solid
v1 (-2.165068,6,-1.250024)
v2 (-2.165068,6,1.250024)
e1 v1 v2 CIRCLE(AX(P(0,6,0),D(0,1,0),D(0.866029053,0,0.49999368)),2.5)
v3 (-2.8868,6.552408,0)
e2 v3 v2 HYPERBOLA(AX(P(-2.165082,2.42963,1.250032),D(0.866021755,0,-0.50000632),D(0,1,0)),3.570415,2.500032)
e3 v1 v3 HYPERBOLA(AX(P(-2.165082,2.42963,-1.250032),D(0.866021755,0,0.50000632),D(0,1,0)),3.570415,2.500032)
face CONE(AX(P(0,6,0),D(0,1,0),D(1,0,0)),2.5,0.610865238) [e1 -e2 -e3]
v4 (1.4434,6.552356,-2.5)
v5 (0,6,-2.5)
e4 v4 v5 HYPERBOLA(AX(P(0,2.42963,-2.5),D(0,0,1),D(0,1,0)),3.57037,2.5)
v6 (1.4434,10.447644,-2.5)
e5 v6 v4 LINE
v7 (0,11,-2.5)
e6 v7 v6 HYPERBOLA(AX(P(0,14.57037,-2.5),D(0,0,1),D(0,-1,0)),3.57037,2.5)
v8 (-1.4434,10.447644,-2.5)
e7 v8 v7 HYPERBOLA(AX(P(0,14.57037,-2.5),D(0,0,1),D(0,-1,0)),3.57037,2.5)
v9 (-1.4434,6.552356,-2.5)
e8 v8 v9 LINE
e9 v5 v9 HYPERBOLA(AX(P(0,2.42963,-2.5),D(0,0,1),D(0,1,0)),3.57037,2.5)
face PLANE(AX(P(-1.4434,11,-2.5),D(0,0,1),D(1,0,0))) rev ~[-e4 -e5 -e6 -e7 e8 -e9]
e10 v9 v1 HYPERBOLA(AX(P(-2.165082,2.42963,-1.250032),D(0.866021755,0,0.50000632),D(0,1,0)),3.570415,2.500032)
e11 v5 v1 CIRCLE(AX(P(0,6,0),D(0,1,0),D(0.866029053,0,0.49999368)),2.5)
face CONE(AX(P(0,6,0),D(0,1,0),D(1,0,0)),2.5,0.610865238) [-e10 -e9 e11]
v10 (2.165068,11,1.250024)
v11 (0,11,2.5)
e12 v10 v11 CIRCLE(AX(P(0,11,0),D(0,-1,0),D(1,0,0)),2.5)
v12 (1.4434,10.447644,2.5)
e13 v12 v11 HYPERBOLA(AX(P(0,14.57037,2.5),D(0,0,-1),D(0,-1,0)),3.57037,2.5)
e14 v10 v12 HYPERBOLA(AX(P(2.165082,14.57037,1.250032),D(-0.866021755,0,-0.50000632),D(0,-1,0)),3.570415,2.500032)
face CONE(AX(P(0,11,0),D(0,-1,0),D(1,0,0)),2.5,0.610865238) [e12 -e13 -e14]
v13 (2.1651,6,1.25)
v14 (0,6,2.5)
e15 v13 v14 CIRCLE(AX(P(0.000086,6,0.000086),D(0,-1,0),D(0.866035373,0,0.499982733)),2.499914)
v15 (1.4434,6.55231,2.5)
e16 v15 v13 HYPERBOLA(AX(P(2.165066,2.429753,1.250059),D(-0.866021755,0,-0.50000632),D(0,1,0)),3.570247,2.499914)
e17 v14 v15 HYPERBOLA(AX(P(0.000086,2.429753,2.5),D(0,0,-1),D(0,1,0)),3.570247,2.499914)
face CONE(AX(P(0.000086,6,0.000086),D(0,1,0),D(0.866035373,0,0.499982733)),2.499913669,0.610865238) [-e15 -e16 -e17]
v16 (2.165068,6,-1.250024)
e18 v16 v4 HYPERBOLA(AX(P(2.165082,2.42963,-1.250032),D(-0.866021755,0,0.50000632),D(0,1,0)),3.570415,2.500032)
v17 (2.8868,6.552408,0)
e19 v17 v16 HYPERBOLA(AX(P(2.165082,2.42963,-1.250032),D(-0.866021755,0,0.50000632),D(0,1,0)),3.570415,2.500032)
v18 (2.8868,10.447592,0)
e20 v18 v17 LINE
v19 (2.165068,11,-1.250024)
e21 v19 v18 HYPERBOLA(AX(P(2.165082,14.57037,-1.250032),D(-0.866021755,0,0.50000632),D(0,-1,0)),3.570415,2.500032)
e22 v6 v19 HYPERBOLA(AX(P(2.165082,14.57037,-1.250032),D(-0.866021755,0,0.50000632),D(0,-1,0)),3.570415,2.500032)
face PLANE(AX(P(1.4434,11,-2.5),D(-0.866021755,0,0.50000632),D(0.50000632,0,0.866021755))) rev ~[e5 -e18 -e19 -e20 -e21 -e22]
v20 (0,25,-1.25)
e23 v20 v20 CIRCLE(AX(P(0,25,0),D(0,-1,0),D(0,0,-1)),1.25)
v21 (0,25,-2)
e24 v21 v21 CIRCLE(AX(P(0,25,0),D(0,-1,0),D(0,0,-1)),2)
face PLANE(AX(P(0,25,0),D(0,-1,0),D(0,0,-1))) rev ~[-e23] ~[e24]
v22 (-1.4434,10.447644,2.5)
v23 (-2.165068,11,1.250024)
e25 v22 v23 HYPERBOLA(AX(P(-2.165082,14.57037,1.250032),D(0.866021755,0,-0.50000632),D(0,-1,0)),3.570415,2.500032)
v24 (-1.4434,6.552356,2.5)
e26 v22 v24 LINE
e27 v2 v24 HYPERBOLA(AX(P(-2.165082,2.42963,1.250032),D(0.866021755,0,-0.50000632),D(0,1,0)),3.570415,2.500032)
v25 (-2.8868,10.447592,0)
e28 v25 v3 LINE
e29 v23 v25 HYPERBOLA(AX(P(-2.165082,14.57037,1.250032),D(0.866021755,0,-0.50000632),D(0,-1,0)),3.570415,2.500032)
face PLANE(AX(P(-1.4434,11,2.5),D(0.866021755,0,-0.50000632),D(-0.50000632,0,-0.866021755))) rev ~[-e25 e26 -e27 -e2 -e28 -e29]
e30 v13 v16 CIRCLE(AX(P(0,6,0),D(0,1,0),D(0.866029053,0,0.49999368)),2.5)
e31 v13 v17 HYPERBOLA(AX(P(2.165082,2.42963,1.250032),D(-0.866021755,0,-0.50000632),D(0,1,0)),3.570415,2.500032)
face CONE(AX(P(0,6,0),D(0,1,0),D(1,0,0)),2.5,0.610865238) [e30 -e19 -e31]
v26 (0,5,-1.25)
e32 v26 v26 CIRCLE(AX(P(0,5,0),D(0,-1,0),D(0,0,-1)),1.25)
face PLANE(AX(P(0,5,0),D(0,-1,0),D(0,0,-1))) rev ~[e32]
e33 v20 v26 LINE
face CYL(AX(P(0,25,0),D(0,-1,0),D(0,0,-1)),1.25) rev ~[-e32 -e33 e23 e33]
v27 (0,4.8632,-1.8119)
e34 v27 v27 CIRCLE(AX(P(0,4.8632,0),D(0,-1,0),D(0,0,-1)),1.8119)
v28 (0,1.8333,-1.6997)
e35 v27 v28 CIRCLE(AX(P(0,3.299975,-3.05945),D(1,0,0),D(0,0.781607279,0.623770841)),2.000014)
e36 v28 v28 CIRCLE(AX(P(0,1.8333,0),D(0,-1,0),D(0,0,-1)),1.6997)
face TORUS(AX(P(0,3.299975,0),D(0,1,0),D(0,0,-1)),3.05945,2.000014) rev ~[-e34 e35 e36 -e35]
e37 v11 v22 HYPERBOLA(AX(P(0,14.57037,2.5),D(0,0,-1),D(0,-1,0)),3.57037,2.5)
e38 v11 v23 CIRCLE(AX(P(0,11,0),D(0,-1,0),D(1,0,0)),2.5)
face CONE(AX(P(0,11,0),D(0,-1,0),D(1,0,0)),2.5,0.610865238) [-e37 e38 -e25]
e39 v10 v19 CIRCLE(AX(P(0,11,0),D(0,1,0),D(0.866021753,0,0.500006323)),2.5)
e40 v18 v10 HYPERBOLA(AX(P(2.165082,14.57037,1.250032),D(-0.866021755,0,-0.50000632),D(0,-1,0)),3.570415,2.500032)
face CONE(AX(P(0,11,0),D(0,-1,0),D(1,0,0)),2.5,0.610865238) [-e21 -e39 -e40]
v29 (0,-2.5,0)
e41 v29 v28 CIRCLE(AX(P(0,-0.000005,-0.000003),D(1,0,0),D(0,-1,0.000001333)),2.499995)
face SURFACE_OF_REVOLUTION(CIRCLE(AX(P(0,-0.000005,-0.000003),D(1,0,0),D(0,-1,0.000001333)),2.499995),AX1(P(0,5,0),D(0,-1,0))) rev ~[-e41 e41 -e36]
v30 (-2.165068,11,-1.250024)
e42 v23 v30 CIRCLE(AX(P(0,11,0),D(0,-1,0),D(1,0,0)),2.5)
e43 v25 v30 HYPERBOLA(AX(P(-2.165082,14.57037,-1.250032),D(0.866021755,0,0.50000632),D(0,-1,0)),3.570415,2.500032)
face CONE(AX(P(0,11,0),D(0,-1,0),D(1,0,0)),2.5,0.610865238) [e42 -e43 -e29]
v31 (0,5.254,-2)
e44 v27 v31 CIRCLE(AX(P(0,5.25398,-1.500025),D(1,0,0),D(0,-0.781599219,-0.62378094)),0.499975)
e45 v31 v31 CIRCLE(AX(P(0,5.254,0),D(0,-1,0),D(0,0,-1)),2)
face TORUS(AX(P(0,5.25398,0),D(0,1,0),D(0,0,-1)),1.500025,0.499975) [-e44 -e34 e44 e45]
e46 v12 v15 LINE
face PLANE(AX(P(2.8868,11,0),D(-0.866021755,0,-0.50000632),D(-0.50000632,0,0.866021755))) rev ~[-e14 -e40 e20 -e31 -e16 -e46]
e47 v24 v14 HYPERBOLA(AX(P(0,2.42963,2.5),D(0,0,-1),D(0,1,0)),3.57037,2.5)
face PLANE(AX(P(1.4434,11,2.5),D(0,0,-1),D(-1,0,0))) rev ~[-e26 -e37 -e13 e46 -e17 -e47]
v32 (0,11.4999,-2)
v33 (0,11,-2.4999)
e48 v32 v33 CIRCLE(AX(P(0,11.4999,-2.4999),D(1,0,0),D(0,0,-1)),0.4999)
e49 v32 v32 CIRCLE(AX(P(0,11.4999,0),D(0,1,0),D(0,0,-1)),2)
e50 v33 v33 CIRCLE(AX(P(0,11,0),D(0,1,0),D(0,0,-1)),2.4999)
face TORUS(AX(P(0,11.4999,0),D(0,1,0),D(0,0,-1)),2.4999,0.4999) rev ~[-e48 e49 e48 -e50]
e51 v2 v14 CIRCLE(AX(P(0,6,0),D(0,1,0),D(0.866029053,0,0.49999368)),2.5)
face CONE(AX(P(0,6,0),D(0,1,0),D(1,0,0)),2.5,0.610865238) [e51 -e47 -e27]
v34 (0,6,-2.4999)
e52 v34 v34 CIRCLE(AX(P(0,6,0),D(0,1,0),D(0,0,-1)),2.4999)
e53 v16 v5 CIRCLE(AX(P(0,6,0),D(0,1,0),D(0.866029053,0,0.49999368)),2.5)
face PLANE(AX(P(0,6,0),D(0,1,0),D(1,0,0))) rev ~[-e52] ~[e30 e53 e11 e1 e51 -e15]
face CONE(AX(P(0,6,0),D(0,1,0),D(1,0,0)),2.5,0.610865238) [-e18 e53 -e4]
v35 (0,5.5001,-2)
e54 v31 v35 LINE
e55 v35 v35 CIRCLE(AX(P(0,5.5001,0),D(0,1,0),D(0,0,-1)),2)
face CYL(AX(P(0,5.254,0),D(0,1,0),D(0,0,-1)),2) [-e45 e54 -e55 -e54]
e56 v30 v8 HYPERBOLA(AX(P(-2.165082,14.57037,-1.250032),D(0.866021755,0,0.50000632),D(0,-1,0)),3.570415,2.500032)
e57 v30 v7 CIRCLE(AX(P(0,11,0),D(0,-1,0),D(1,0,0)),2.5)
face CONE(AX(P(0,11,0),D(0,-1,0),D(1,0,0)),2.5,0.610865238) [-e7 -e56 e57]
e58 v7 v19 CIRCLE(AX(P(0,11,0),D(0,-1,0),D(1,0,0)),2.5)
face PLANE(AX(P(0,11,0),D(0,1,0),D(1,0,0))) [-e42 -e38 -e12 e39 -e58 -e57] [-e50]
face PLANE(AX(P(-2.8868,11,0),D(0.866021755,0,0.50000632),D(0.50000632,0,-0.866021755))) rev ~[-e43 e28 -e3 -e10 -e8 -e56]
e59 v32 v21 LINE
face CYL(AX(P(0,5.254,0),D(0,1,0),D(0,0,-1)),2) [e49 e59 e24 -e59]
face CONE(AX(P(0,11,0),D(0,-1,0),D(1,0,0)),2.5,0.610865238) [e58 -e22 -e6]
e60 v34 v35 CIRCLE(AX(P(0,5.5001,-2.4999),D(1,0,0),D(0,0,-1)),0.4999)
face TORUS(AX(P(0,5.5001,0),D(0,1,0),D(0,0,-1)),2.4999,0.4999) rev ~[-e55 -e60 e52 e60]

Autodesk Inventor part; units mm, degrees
ref_plane "YZ Plane" through (0, 0, 0) normal (1, 0, 0) x (0, 1, 0)
ref_plane "XZ Plane" through (0, 0, 0) normal (0, 1, 0) x (-1, 0, 0)
sketch "Sketch1" plane through (0, 0, 0) normal (1, 0, 0) x (0, 1, 0)
  arc A0 (-2.5, 0) -> (1.8333, -1.6997) centre (0, 0) ccw
  line L0 (5.254, -2) -> (25, -2)
  line L1 (25, -2) -> (25, -1.25)
  arc A1 (4.8632, -1.8119) -> (1.8333, -1.6997) centre (3.3, -3.0594) ccw
  arc A2 (4.8632, -1.8119) -> (5.254, -2) centre (5.254, -1.5) ccw
  line L2 (25, -1.25) -> (5, -1.25)
  line L3 (5, -1.25) -> (5, 0)
  line L4 (5, 0) -> (-2.5, 0)
  point P0 (4.9964, -2)
  dimension "d0" = 5
  dimension "d2" = 3.3
  dimension "d3" = 4
  dimension "d4" = 25
  dimension "d6" = 0.5
  dimension "d8" = 20
  dimension "d9" = 0.75
  dimension "d10" = 19.746
  dimension "d11" = 5
revolve "Revolution1" add sketch "Sketch1" angle 360 about axis through (0, 5, 0) along (0, -1, 0)
thread "Thread1" size "M2.5x0.35" class "6H" standard "ANSI Metric M Profile" full length
ref_plane "Work Plane1" through (0, 11, 0) normal (0, 1, 0) x (1, 0, 0)
sketch "Sketch2" plane through (0, 11, 0) normal (0, 1, 0) x (1, 0, 0)
  line L0 (1.4434, 2.5) -> (2.8868, 0)
  line L1 (2.8868, 0) -> (1.4434, -2.5)
  line L2 (1.4434, -2.5) -> (-1.4434, -2.5)
  line L3 (-1.4434, -2.5) -> (-2.8868, 0)
  line L4 (-2.8868, 0) -> (-1.4434, 2.5)
  line L5 (-1.4434, 2.5) -> (1.4434, 2.5)
  circle A0 centre (0, 0) radius 1.25 projected
  point P0 (0, 0)
  point P1 (0, 0)
  dimension "d16" = 5
extrude "Extrusion1" add sketch "Sketch2" against normal blind 5
sketch "Sketch3" plane through (0, 11, 0) normal (0, 1, 0) x (1, 0, 0)
  circle A0 centre (0, 0) radius 2.5
  line L0 (-2.8868, 0) -> (-1.4434, 2.5) projected
extrude "Extrusion2" cut sketch "Sketch3" against normal blind 40 draft 35 and the other way blind 40 keep common part
sketch "Sketch4" plane through (0, 6, 0) normal (0, -1, 0) x (1, 0, 0)
  arc A0 (2.1651, 1.25) -> (0, 2.5) centre (0, 0) ccw projected
  circle A1 centre (0, 0) radius 2.5 projected
  point P0 (0, 0)
extrude "Extrusion3" cut sketch "Sketch4" against normal blind 40 draft 35 and the other way blind 40 keep common part
fillet "Fillet1" radius 0.5 2 edges at (0, 11, 2) (0, 6, 2)
properties part number "Component 41(Push Rod Base)"
